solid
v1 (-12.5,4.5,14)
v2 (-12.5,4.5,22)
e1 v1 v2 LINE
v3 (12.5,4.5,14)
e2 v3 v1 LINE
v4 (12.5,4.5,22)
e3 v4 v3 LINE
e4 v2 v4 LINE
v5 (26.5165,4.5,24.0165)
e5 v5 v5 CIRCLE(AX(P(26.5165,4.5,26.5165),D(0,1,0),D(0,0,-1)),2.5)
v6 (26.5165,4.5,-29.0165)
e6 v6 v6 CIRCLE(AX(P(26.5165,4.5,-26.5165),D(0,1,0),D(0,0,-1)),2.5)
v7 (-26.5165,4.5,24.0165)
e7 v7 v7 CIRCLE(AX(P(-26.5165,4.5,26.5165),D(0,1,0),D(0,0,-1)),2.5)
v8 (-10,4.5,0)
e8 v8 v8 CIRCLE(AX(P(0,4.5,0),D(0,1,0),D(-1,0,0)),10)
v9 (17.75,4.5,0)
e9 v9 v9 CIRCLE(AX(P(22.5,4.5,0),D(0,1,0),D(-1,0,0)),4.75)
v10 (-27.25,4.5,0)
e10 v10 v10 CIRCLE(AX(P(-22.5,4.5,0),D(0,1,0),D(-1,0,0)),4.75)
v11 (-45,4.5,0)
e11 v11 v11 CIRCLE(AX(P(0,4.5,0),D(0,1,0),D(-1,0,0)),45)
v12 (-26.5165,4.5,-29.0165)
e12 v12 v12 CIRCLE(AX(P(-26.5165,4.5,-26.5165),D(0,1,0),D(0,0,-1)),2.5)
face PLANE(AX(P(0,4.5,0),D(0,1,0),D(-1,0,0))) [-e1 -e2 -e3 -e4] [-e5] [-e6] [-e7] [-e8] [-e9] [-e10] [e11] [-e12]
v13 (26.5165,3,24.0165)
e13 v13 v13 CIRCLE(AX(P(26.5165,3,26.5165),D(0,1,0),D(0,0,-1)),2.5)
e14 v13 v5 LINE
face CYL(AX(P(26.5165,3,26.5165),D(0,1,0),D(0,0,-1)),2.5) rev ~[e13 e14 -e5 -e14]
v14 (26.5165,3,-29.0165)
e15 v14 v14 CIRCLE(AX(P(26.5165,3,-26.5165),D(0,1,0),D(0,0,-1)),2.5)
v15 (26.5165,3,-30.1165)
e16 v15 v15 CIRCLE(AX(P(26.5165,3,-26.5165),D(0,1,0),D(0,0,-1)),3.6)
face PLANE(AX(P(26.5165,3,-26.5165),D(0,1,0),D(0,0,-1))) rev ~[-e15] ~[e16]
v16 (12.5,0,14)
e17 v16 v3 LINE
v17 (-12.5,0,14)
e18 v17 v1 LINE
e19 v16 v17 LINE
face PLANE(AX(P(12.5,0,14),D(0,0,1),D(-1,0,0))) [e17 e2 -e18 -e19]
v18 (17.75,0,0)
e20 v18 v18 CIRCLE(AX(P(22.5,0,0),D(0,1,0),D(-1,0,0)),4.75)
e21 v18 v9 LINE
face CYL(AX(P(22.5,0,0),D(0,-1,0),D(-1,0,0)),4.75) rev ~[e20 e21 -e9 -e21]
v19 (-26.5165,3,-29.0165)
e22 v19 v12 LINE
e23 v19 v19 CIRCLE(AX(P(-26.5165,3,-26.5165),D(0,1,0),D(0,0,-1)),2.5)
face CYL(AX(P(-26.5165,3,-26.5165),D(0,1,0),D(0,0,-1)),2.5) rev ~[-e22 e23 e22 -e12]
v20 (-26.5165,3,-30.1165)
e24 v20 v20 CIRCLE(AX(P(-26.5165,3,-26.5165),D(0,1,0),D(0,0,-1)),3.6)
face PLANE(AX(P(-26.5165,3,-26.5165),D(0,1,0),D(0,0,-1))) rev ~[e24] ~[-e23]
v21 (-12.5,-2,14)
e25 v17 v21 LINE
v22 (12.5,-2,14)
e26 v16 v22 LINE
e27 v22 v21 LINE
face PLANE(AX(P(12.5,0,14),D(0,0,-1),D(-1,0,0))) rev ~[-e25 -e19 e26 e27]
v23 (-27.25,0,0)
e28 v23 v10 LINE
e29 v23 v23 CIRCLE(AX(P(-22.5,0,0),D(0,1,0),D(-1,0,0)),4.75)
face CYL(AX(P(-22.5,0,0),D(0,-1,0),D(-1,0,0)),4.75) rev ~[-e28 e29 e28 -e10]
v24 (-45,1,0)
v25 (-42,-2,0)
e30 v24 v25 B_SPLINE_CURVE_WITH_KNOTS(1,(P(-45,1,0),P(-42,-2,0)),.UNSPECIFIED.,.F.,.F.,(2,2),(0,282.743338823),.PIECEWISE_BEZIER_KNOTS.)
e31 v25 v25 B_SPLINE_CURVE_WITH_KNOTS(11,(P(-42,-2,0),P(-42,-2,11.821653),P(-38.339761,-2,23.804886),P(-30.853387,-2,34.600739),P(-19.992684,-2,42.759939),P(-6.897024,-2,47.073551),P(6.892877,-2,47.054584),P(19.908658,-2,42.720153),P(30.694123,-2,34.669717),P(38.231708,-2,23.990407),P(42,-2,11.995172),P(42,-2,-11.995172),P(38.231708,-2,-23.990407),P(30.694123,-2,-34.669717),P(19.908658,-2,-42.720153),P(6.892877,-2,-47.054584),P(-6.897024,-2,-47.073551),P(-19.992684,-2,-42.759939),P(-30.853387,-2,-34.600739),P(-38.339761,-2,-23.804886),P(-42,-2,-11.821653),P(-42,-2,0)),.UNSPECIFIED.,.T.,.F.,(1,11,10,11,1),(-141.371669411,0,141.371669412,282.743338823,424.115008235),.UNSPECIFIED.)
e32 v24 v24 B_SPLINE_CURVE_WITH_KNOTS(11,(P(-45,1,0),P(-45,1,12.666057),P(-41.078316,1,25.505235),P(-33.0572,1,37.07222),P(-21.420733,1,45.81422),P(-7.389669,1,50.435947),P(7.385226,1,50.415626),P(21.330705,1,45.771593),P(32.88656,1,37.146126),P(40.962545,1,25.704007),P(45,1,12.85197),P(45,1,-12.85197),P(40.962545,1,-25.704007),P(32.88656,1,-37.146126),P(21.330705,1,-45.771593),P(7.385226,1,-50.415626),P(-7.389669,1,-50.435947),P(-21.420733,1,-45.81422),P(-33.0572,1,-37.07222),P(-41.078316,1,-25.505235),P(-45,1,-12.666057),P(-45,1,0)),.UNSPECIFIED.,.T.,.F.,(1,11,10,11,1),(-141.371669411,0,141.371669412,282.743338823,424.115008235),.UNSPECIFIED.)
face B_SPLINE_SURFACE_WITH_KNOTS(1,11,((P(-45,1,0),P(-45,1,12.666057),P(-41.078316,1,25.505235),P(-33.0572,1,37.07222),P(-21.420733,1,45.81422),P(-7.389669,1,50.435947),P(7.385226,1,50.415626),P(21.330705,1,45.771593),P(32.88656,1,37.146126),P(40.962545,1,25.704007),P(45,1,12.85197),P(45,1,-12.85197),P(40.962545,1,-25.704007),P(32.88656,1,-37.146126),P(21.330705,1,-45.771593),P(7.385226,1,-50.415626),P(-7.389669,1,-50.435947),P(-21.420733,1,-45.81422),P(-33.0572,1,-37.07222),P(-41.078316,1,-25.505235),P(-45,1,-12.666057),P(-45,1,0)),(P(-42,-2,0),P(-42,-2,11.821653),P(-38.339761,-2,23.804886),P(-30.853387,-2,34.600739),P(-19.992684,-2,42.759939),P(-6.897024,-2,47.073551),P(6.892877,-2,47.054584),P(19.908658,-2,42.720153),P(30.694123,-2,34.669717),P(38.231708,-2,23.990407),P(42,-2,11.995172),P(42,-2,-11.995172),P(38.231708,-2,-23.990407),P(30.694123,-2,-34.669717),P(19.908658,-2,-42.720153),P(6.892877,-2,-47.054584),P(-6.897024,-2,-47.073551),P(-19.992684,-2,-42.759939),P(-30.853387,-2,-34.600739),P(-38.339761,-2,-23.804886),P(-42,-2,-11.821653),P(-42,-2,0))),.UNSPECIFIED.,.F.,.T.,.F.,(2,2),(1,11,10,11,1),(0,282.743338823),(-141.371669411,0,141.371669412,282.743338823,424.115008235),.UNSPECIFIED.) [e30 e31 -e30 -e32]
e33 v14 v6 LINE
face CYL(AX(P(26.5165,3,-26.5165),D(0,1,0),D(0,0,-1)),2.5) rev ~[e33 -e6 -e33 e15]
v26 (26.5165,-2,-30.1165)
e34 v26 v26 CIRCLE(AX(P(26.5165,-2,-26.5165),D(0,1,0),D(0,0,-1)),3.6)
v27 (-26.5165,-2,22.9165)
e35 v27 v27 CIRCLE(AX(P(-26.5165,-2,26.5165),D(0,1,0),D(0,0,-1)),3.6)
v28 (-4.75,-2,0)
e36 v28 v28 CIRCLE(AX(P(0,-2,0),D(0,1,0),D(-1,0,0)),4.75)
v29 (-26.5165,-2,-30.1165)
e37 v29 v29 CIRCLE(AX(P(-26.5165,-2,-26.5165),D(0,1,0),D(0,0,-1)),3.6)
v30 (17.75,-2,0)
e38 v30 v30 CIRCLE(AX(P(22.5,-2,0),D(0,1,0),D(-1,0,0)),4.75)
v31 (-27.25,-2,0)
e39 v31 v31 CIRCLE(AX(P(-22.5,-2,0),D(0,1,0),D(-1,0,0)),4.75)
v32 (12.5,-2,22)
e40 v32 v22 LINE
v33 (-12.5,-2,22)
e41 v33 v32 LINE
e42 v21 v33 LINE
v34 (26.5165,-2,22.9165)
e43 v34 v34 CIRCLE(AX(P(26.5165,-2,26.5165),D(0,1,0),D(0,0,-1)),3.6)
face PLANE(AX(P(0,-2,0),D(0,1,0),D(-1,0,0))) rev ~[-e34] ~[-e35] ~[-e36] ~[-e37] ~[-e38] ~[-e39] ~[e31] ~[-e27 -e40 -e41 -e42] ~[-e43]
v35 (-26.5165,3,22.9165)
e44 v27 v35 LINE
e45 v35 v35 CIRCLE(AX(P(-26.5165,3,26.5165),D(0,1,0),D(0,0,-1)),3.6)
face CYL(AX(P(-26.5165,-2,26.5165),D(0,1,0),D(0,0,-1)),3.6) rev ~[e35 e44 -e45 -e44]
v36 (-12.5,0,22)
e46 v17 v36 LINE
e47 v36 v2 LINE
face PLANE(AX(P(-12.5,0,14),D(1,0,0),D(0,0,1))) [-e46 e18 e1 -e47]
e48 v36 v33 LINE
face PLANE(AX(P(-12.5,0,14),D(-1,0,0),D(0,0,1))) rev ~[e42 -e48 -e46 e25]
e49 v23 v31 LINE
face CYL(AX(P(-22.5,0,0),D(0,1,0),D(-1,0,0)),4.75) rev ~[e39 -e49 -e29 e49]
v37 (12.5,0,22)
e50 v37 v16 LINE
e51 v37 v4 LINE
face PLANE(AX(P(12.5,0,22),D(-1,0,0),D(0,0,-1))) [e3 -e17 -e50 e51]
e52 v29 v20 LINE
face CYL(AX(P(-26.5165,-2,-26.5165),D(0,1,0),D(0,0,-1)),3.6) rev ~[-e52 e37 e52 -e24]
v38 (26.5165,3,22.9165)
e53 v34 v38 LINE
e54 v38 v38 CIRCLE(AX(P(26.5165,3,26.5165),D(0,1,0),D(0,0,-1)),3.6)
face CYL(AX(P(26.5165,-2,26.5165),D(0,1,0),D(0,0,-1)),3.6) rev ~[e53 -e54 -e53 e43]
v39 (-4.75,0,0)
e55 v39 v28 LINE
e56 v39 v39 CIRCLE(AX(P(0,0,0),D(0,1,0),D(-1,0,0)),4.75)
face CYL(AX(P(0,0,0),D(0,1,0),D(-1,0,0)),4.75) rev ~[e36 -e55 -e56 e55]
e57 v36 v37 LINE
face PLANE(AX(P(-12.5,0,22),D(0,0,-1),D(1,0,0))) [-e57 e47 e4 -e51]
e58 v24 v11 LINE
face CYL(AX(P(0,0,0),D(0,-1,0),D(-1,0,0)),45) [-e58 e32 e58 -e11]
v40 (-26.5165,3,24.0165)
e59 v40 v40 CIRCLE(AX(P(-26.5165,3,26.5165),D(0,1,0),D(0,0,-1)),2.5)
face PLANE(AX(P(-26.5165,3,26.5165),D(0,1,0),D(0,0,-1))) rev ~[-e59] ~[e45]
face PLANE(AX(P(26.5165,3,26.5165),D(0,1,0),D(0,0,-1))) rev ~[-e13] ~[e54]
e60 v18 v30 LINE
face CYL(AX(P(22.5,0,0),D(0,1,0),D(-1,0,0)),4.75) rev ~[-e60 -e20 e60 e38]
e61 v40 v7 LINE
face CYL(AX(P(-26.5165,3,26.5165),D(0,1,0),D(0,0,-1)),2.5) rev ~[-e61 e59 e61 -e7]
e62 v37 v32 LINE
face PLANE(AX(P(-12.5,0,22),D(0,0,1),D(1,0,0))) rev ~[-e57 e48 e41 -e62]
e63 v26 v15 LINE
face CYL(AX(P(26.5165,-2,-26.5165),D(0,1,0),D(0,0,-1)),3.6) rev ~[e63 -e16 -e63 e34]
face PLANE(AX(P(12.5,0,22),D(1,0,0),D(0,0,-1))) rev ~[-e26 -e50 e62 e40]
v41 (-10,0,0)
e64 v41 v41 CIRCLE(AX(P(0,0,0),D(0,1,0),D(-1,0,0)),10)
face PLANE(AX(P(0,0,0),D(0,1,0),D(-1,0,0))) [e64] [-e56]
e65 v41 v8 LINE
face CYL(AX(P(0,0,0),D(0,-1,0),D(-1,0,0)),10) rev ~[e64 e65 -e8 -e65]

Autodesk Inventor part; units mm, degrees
ref_plane "YZ Plane" through (0, 0, 0) normal (1, 0, 0) x (0, 1, 0)
ref_plane "XZ Plane" through (0, 0, 0) normal (0, 1, 0) x (-1, 0, 0)
ref_plane "XY Plane" through (0, 0, 0) normal (0, 0, 1) x (1, 0, 0)
sketch "Sketch1" plane through (0, 0, 0) normal (0, 1, 0) x (-1, 0, 0)
  circle A0 centre (0, 0) radius 45
  circle A1 centre (0, 0) radius 10
  circle A2 centre (22.5, 0) radius 4.75
  circle A3 centre (-22.5, 0) radius 4.75
  line L0 (0, -25.6154) -> (0, 19.3488) construction
  circle A4 centre (0, 0) radius 4.75
  line L1 (12.5, 22) -> (-12.5, 22)
  line L2 (-12.5, 22) -> (-12.5, 14)
  line L3 (-12.5, 14) -> (12.5, 14)
  line L4 (12.5, 14) -> (12.5, 22)
  line L5 (12.5, 22) -> (-12.5, 14) construction
  line L6 (-12.5, 22) -> (12.5, 14) construction
  point P0 (0, 18)
  dimension "d0" = 90
  dimension "d1" = 20
  dimension "d2" = 45
  dimension "d20" = 18
  dimension "d21" = 8
  dimension "d22" = 25
  dimension "d26" = 9.5
extrude "Extrusion1" add sketch "Sketch1" against normal blind 2 contours A0 | A1
extrude "Extrusion2" add sketch "Sketch1" along normal blind 4.5 contours A0
sketch "Sketch2" plane through (0, -2, 0) normal (0, -1, 0) x (1, 0, 0)
  line L0 (26.5165, -26.5165) -> (0, 0) construction
  line L1 (17.2429, 0) -> (-14.3285, 0) construction
  line L2 (0, -10.0849) -> (0, 10.0849) construction
  point P0 (-26.5165, -26.5165)
  point P1 (26.5165, 26.5165)
  point P2 (-26.5165, 26.5165)
  dimension "d9" = 37.5
  dimension "d10" = 45
hole "Hole1" at (26.5165, -2, -26.5165) at (-26.5165, -2, -26.5165) at (26.5165, -2, 26.5165) at (-26.5165, -2, 26.5165) direction (0, 1, 0) diameter 5 end through all counterbore diameter 7.2 counterbore depth 5
chamfer "Chamfer1" distance 3 angle 45 1 edges at (45, -2, 0)
properties part number "SCARA swivel top - lid"
